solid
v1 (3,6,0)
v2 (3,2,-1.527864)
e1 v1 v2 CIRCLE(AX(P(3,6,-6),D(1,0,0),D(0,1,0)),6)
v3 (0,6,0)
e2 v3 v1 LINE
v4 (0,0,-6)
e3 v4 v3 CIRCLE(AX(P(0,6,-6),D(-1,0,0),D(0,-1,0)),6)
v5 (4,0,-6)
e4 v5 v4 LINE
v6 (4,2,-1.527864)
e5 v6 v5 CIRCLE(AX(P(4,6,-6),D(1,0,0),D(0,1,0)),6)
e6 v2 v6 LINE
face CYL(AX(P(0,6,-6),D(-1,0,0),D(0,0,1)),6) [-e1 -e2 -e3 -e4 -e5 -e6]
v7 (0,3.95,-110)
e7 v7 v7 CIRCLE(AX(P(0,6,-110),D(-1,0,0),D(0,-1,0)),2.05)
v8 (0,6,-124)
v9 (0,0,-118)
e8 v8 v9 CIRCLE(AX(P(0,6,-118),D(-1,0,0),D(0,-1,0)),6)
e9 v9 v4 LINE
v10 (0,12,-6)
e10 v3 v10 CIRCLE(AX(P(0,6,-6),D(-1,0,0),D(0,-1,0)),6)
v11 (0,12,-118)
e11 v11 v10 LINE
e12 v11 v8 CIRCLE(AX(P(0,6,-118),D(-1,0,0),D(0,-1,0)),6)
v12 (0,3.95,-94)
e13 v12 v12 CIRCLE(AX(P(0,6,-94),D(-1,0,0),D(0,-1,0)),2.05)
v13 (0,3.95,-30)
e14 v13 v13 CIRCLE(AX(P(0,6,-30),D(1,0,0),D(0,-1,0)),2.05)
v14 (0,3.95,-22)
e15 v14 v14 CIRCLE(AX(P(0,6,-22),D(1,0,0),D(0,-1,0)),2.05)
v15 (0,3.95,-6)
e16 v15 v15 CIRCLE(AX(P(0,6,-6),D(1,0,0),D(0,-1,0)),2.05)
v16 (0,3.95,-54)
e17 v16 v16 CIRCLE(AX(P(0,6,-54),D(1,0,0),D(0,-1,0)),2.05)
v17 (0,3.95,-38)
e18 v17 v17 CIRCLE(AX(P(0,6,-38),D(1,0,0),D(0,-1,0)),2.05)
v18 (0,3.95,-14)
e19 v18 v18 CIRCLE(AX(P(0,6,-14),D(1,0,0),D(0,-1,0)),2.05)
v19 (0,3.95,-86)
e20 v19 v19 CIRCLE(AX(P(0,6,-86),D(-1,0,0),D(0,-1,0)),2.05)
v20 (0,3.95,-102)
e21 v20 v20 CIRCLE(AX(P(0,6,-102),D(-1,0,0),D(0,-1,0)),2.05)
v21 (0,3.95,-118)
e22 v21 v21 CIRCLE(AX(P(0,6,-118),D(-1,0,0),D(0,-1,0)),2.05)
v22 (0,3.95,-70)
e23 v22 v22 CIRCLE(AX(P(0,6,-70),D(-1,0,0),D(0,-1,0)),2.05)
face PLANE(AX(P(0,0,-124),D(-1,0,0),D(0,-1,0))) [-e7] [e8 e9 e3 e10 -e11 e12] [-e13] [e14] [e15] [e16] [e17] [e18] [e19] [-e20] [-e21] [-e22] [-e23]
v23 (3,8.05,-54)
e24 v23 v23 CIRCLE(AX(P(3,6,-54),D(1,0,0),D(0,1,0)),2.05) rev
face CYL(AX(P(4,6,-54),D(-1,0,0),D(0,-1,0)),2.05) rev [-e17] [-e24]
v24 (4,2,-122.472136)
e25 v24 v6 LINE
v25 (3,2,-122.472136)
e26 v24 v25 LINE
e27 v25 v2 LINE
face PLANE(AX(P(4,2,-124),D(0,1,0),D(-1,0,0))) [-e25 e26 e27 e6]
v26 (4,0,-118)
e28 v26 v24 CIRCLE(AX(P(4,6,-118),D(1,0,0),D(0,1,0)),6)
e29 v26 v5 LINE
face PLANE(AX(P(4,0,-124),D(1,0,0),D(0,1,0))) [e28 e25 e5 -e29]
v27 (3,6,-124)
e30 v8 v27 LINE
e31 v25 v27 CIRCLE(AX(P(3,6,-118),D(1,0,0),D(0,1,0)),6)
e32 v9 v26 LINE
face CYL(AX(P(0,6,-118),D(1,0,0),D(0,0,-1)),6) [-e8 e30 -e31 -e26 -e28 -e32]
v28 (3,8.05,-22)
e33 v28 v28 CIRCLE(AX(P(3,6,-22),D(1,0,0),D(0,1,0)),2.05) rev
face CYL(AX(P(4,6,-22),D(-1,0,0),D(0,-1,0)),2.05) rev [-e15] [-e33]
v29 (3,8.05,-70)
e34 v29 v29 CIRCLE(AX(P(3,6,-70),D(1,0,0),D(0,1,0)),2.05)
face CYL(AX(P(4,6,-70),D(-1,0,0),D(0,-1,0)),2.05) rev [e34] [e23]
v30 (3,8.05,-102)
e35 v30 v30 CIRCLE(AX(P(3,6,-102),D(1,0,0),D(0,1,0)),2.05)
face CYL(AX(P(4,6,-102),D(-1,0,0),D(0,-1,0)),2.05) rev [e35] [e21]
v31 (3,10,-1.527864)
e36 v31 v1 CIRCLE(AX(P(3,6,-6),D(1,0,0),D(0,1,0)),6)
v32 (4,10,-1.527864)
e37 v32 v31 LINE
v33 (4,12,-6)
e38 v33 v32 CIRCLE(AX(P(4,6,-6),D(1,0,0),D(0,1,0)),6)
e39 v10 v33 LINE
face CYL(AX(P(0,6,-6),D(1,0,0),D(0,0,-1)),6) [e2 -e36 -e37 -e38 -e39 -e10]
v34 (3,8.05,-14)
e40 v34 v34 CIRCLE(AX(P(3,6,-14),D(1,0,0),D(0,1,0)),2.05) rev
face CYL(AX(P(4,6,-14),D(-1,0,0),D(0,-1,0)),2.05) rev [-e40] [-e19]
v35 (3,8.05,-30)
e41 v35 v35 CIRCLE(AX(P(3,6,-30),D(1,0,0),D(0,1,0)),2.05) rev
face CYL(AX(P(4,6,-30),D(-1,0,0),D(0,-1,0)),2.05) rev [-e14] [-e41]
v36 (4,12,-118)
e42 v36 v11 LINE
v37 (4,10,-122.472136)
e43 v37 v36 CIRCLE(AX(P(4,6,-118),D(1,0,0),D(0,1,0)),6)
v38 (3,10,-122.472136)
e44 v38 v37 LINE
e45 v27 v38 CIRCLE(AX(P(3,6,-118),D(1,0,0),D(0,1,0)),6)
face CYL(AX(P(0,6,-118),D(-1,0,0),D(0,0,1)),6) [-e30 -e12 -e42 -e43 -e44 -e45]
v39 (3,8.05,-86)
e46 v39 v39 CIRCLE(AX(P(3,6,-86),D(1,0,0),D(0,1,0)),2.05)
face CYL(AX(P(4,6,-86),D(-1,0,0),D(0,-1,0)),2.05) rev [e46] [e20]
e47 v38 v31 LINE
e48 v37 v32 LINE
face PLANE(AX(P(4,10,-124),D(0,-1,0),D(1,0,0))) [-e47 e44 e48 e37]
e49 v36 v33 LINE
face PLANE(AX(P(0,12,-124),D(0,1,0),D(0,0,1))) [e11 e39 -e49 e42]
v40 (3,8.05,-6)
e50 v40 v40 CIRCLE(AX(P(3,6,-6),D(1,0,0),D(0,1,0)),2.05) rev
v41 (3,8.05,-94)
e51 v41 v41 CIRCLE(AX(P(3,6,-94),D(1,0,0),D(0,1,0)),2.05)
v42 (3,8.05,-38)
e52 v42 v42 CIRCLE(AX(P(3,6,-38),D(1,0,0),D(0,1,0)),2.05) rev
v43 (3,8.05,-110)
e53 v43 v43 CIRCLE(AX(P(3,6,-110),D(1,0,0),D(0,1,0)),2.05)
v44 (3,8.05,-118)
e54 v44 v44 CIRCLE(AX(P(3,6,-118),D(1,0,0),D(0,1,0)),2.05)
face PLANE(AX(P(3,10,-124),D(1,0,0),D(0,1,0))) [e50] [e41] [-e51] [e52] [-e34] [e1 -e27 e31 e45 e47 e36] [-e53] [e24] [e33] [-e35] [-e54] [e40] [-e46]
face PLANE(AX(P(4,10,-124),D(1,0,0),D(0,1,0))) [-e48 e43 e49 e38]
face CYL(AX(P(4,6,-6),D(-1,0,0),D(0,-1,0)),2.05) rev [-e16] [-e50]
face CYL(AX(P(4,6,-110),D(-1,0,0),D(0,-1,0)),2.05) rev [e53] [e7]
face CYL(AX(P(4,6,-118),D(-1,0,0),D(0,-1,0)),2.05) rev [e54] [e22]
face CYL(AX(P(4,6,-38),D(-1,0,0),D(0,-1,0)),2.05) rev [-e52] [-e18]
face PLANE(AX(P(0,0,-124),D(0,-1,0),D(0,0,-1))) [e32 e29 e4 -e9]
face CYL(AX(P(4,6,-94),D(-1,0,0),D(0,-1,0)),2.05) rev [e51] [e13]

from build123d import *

# Parameters (mm, degrees)
BOSS_EXTRUDE1_DEPTH     = 124
FILLET1_R               = 6
SKETCH2_R               = 2.05
CUT_EXTRUDE1_DEPTH      = 125.643491607
LPATTERN1_COUNT         = 7
LPATTERN1_PITCH         = 8
MIRROR1_COPY_1_SKETCH_R = 2.05
MIRROR1_COPY_1_DEPTH    = 125.643491607
MIRROR1_COPY_2_SKETCH_R = 2.05
MIRROR1_COPY_2_DEPTH    = 125.643491607
MIRROR1_COPY_3_SKETCH_R = 2.05
MIRROR1_COPY_3_DEPTH    = 125.643491607
MIRROR1_COPY_4_SKETCH_R = 2.05
MIRROR1_COPY_4_DEPTH    = 125.643491607
MIRROR1_COPY_5_SKETCH_R = 2.05
MIRROR1_COPY_5_DEPTH    = 125.643491607


with BuildPart() as part:
    # Sketch1 → Boss-Extrude1 (new body)
    with BuildSketch(Plane.XY):
        Polygon((0, 0), (4, 0), (4, 2), (3, 2), (3, 10), (4, 10), (4, 12), (0, 12), align=None)
    extrude(amount=-BOSS_EXTRUDE1_DEPTH)

    # Fillet1
    fillet1_edges = [part.edges().sort_by_distance(p)[0] for p in [
        (2, 12, 0),
        (2, 0, 0),
        (2, 0, -124),
        (2, 12, -124),
    ]]
    fillet(fillet1_edges, radius=FILLET1_R - 0.0001)  # a hair under: the kernel refuses the full size

    # Sketch2 → Cut-Extrude1 (cut, through all)
    with BuildSketch(Plane.ZY):
        with Locations(Location((-118, 6, 0), (0, 0, 270))):
            Circle(SKETCH2_R)
    cut_extrude1 = extrude(amount=-CUT_EXTRUDE1_DEPTH, mode=Mode.SUBTRACT)

    # LPattern1: Cut-Extrude1 ×7, 1 skipped
    with Locations(*[(0, 0, i * LPATTERN1_PITCH) for i in range(1, LPATTERN1_COUNT) if i not in (5,)]):
        add(cut_extrude1, mode=Mode.SUBTRACT)

    # Mirror1: Cut-Extrude1 across plane
    add(cut_extrude1.mirror(Plane.XY.offset(-62)), mode=Mode.SUBTRACT)

    # Mirror1 copy 1 sketch → Mirror1 copy 1 (cut, through all)
    with BuildSketch(Plane(origin=(0, 0, -132), x_dir=(0, 0, -1), z_dir=(-1, 0, 0))):
        with Locations((-118, -6)):
            Circle(MIRROR1_COPY_1_SKETCH_R)
    extrude(amount=-MIRROR1_COPY_1_DEPTH, mode=Mode.SUBTRACT)

    # Mirror1 copy 2 sketch → Mirror1 copy 2 (cut, through all)
    with BuildSketch(Plane(origin=(0, 0, -140), x_dir=(0, 0, -1), z_dir=(-1, 0, 0))):
        with Locations((-118, -6)):
            Circle(MIRROR1_COPY_2_SKETCH_R)
    extrude(amount=-MIRROR1_COPY_2_DEPTH, mode=Mode.SUBTRACT)

    # Mirror1 copy 3 sketch → Mirror1 copy 3 (cut, through all)
    with BuildSketch(Plane(origin=(0, 0, -148), x_dir=(0, 0, -1), z_dir=(-1, 0, 0))):
        with Locations((-118, -6)):
            Circle(MIRROR1_COPY_3_SKETCH_R)
    extrude(amount=-MIRROR1_COPY_3_DEPTH, mode=Mode.SUBTRACT)

    # Mirror1 copy 4 sketch → Mirror1 copy 4 (cut, through all)
    with BuildSketch(Plane(origin=(0, 0, -156), x_dir=(0, 0, -1), z_dir=(-1, 0, 0))):
        with Locations((-118, -6)):
            Circle(MIRROR1_COPY_4_SKETCH_R)
    extrude(amount=-MIRROR1_COPY_4_DEPTH, mode=Mode.SUBTRACT)

    # Mirror1 copy 5 sketch → Mirror1 copy 5 (cut, through all)
    with BuildSketch(Plane(origin=(0, 0, -172), x_dir=(0, 0, -1), z_dir=(-1, 0, 0))):
        with Locations((-118, -6)):
            Circle(MIRROR1_COPY_5_SKETCH_R)
    extrude(amount=-MIRROR1_COPY_5_DEPTH, mode=Mode.SUBTRACT)


solid = part.part
